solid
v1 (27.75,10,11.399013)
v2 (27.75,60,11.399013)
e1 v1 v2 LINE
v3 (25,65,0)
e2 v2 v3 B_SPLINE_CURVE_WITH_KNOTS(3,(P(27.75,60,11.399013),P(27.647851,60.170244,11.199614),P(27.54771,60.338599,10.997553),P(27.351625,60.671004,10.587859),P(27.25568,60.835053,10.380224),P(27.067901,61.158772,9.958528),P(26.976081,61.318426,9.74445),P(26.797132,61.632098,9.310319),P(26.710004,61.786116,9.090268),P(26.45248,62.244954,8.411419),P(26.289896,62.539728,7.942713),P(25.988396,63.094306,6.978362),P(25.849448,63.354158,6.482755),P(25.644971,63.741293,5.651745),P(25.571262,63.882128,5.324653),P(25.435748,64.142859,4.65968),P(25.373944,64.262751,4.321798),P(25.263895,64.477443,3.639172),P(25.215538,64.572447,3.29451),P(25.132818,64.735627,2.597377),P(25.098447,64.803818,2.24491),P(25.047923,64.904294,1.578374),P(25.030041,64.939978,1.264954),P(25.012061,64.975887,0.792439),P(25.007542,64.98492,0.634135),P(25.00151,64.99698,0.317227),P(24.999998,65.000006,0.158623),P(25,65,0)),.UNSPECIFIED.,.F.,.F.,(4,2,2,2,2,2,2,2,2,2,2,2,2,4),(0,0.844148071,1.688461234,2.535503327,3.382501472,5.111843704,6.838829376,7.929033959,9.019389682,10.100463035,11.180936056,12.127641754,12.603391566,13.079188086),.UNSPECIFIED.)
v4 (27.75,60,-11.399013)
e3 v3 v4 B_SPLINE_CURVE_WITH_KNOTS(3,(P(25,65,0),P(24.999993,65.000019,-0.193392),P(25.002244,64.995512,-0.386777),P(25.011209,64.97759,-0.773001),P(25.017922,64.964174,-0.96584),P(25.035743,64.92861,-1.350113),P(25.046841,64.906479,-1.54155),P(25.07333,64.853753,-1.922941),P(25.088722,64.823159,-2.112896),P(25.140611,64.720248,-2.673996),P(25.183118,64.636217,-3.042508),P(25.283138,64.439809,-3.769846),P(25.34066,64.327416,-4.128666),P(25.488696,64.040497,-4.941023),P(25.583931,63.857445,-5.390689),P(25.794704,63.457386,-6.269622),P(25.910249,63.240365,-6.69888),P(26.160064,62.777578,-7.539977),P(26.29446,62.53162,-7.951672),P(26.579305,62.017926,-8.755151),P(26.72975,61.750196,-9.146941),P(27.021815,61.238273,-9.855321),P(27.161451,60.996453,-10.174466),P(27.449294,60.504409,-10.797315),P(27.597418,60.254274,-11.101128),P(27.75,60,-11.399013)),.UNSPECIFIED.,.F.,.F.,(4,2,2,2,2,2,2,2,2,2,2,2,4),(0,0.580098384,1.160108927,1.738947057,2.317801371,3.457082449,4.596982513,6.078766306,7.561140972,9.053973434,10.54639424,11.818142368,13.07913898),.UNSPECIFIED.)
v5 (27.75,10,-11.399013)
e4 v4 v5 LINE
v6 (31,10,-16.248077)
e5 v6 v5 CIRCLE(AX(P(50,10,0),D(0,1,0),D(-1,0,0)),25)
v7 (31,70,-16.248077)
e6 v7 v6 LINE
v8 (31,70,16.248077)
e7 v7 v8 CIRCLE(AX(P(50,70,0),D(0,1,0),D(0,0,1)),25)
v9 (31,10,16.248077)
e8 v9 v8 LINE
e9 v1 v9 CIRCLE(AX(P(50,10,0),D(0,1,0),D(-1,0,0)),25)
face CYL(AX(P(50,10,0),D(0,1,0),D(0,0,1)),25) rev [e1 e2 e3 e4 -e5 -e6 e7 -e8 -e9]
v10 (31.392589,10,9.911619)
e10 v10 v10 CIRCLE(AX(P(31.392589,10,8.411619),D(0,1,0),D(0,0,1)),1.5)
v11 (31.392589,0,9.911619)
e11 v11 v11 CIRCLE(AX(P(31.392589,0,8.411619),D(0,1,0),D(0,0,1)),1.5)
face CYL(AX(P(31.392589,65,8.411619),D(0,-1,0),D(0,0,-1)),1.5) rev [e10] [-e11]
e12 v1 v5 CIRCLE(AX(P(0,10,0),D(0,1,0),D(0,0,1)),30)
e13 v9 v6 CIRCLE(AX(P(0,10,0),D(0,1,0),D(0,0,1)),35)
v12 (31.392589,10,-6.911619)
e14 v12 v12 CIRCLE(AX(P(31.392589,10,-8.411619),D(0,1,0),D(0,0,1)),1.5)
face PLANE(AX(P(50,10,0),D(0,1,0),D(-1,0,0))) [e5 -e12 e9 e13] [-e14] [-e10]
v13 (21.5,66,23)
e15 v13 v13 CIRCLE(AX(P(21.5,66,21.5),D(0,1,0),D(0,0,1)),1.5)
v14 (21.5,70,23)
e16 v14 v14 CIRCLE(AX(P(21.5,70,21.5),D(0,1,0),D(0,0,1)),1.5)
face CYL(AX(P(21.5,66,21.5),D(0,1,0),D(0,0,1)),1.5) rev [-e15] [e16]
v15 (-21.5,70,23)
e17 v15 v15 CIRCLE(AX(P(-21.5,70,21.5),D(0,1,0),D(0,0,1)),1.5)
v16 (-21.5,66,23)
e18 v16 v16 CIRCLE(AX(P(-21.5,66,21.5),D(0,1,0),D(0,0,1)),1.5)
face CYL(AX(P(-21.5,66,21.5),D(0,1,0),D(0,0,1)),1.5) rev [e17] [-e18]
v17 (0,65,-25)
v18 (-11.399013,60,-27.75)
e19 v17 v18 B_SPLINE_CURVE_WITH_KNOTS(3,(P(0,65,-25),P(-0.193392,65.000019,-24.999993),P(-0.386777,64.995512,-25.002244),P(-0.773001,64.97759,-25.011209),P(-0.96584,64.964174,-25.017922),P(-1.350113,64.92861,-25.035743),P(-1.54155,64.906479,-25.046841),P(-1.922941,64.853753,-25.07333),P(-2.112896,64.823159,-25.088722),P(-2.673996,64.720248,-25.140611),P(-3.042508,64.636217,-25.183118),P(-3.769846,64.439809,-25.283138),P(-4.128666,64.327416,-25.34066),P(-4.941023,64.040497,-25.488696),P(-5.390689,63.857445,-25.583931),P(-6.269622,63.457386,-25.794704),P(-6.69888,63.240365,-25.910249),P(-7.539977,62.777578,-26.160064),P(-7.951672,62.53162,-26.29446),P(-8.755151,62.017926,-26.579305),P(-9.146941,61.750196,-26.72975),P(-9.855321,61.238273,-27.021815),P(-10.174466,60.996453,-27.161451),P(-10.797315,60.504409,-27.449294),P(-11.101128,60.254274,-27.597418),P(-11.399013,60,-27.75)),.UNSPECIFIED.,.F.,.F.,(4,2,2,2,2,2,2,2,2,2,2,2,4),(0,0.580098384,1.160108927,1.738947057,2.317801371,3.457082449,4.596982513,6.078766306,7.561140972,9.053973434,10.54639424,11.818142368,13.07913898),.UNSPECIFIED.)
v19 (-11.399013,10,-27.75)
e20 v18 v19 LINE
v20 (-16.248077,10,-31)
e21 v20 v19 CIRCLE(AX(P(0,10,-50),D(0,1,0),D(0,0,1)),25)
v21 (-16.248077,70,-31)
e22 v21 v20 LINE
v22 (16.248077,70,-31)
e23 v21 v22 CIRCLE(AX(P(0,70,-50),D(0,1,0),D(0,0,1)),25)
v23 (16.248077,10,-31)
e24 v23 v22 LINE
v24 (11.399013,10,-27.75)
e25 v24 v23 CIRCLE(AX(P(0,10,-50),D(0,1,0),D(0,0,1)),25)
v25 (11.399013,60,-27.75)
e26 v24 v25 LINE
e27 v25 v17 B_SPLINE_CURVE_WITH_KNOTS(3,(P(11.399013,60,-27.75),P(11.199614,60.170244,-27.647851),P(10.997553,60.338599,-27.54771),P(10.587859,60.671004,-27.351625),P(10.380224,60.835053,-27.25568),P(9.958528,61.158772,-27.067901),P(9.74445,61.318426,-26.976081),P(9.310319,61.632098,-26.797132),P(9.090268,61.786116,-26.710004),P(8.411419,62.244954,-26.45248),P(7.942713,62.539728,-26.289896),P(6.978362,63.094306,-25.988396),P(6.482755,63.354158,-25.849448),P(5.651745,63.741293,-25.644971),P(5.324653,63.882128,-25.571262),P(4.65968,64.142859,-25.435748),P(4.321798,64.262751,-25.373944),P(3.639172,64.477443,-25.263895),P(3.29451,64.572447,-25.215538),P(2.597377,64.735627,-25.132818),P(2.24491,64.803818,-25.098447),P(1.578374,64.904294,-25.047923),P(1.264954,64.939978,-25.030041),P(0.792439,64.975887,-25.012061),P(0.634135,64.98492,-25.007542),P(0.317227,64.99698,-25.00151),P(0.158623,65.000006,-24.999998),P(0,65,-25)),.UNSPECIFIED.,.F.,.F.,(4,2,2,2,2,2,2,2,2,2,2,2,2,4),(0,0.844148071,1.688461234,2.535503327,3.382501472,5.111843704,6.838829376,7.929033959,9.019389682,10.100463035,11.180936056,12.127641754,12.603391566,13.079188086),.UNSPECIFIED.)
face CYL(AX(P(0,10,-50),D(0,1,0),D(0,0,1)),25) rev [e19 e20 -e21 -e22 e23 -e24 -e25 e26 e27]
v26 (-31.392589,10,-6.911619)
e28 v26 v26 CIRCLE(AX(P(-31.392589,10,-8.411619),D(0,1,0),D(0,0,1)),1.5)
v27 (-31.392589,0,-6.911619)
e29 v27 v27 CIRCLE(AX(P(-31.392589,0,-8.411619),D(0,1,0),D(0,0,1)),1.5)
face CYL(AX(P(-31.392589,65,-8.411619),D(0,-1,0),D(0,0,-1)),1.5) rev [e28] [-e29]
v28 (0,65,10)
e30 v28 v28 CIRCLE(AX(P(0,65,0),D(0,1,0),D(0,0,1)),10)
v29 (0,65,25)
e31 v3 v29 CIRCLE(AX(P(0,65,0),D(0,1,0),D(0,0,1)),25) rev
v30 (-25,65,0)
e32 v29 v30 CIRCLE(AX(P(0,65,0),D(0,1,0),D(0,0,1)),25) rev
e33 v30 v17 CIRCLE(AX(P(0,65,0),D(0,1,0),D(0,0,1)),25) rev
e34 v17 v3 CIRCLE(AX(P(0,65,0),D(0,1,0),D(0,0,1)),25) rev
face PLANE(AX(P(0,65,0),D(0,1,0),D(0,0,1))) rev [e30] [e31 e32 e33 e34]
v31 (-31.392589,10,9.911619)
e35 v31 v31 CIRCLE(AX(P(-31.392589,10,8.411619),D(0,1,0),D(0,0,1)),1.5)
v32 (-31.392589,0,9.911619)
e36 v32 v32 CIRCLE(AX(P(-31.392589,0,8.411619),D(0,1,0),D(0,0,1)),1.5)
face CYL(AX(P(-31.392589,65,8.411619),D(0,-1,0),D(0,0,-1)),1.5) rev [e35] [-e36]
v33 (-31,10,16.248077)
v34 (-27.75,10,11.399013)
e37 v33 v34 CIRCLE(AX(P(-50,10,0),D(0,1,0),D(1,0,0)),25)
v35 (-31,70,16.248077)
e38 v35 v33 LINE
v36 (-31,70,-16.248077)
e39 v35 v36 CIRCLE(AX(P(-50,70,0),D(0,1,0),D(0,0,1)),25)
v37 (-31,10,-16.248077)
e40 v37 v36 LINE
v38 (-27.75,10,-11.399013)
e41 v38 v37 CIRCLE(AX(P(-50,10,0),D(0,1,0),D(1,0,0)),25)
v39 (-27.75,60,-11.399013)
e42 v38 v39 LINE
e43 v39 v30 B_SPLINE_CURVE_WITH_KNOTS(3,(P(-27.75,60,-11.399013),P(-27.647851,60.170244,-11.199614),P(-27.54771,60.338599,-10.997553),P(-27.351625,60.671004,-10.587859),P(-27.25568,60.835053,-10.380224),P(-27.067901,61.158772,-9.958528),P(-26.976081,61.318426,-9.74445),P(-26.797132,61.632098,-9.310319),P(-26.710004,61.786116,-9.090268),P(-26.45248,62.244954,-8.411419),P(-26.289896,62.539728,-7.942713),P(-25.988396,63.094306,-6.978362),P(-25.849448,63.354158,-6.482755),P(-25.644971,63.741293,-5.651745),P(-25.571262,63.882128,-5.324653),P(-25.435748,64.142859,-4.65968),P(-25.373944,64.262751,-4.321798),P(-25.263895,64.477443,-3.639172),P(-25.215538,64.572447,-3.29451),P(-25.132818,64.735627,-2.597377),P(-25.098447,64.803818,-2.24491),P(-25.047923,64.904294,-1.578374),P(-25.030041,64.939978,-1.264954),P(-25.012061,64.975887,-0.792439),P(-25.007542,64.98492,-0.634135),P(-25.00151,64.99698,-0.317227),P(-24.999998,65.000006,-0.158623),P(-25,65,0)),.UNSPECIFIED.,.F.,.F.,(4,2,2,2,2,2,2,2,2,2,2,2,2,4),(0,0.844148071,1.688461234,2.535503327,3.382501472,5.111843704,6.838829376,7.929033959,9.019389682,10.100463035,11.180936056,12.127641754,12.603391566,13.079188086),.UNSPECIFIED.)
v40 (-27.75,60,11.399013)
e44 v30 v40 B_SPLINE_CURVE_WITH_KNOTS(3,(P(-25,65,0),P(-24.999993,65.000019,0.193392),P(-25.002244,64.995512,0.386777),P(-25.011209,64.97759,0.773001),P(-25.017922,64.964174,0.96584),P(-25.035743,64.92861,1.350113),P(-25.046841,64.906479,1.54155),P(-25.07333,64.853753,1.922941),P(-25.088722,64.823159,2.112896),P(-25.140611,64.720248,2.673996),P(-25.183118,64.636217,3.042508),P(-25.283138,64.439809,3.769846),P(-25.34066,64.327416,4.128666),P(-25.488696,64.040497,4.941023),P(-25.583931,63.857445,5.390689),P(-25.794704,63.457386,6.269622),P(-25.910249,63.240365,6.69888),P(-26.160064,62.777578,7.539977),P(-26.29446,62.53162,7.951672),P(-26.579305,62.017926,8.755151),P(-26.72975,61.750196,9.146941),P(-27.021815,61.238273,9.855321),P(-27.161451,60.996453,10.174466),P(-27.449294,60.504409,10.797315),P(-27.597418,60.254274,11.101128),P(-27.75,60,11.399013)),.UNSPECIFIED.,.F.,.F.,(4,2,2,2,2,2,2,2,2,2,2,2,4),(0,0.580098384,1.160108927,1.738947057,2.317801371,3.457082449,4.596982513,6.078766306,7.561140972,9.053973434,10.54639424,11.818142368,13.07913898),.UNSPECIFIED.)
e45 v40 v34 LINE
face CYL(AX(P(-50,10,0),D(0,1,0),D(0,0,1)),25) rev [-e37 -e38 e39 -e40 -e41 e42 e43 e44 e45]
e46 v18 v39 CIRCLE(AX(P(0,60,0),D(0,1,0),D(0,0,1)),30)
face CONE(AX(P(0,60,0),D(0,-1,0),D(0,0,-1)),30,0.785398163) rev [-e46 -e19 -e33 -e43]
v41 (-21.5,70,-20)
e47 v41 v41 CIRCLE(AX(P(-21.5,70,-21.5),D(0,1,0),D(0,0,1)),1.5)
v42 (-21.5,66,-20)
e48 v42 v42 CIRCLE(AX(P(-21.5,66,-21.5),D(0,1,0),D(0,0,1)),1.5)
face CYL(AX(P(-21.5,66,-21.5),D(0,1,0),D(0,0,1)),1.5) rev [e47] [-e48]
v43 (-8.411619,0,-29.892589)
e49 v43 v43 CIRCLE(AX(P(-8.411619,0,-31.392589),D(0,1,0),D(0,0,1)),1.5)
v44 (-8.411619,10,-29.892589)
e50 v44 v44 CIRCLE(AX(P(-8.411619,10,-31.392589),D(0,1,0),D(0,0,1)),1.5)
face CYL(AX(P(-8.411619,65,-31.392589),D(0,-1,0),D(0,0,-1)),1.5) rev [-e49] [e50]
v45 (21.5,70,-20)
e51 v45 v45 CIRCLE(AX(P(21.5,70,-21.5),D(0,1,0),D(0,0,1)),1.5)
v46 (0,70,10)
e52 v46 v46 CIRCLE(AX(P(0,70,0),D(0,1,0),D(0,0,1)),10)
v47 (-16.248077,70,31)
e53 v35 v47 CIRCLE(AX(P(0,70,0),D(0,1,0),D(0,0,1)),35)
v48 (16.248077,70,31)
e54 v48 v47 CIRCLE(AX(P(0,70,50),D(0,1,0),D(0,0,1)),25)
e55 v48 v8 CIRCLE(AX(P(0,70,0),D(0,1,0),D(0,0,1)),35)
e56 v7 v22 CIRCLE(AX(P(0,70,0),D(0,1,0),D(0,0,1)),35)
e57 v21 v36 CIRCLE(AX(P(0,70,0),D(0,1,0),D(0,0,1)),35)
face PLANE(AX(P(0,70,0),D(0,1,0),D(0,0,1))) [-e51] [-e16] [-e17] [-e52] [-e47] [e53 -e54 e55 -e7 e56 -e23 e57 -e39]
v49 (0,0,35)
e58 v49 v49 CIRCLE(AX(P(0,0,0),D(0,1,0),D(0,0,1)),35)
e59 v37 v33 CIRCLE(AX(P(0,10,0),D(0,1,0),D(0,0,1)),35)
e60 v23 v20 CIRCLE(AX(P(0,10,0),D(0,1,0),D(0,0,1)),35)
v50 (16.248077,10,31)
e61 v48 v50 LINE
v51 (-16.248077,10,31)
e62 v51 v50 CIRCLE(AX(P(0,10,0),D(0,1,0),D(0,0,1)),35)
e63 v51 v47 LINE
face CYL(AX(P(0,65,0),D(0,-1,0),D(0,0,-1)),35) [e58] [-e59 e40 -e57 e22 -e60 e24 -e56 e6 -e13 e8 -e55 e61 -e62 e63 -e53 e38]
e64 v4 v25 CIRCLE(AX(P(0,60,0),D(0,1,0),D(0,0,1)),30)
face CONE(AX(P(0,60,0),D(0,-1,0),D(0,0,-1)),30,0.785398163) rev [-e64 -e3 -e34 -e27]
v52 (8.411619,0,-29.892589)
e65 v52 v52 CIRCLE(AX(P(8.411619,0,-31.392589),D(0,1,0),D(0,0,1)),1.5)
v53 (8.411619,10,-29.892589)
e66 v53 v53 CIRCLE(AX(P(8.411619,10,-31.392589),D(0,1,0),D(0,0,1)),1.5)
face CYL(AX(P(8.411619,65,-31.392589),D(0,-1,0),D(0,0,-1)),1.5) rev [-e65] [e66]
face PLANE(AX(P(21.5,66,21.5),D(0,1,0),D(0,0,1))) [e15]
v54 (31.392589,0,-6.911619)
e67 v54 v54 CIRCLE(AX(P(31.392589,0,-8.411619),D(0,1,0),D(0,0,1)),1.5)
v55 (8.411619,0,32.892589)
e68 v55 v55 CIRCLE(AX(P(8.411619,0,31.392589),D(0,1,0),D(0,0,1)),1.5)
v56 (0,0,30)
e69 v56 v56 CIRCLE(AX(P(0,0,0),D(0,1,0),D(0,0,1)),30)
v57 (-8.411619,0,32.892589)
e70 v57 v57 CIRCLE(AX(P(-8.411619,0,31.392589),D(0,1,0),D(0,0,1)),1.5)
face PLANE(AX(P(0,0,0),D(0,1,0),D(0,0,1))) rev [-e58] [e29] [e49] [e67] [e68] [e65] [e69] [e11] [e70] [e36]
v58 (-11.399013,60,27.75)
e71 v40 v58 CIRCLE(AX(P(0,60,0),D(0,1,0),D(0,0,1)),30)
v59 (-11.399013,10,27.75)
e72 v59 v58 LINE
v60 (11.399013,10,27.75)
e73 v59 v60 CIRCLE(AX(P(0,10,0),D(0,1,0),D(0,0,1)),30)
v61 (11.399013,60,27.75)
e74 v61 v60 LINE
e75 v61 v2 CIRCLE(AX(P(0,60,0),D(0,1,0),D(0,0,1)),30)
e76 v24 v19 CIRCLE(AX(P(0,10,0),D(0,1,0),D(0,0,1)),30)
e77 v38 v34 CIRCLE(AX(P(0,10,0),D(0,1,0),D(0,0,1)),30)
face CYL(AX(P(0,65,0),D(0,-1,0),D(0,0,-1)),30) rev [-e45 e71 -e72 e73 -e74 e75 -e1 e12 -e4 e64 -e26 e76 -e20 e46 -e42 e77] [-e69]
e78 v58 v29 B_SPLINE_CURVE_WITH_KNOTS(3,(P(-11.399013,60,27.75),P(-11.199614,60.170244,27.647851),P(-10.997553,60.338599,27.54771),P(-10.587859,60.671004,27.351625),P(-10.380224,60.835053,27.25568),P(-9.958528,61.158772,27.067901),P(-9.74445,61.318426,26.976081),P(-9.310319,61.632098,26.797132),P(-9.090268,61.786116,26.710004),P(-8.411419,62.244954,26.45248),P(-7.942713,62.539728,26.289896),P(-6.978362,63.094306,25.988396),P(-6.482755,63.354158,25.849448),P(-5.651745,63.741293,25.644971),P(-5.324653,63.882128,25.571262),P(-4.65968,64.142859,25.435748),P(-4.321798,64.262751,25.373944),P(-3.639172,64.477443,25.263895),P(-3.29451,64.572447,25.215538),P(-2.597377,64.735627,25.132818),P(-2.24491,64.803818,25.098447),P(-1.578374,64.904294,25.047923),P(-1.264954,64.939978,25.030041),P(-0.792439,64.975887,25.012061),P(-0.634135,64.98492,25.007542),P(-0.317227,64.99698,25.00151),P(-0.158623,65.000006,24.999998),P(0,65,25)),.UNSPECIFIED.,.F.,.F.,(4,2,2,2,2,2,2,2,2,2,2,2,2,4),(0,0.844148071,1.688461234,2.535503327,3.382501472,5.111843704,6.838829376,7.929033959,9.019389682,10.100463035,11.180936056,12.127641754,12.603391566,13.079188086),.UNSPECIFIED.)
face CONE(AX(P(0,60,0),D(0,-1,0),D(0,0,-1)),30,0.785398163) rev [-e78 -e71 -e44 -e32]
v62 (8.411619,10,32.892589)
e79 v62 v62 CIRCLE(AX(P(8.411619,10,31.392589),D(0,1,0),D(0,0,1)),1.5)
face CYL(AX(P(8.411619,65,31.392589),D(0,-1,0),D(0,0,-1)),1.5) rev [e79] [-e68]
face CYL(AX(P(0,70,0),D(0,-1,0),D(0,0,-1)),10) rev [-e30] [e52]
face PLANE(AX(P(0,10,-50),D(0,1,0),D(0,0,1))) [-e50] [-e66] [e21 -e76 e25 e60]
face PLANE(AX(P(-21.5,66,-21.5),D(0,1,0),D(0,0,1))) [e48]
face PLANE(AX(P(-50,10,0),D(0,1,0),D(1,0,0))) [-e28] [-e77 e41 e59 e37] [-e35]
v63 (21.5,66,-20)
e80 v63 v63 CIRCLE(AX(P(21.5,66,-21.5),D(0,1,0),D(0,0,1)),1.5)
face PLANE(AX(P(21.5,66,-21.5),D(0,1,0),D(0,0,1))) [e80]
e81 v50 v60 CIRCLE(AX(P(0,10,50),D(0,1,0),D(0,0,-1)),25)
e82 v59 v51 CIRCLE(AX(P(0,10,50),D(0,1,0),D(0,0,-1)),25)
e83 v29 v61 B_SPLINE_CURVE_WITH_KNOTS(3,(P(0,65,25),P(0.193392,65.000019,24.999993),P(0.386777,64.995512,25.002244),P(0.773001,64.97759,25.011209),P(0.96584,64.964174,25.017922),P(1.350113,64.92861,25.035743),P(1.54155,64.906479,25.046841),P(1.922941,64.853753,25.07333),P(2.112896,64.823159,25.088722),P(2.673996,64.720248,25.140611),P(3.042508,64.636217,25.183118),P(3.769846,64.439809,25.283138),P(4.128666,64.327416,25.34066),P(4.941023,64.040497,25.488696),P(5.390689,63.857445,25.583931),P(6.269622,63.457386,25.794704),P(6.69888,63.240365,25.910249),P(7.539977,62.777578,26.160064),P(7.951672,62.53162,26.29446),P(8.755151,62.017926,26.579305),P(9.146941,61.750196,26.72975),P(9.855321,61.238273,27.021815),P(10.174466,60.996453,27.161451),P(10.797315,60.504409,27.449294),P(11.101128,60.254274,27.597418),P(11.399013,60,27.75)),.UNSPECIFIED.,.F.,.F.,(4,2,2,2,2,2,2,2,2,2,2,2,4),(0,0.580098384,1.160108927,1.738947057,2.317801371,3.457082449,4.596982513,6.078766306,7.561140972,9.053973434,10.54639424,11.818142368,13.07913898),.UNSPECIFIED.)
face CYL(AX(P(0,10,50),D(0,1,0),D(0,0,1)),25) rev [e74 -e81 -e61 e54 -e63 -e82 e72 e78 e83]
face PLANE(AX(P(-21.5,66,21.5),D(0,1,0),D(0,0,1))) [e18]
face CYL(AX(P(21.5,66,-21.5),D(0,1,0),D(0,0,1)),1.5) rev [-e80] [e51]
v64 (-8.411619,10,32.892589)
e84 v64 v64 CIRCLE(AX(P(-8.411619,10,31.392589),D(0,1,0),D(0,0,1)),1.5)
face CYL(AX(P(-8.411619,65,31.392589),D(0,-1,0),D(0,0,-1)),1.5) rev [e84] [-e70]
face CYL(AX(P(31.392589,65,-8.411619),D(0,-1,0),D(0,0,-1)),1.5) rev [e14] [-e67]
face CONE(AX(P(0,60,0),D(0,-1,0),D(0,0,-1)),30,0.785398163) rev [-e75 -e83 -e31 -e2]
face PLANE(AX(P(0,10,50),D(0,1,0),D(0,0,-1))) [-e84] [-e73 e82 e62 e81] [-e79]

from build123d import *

# Parameters (mm, degrees)
SKETCH1_R           = 35
SKETCH1_R_2         = 30
SKETCH1_R_3         = 1.5
BOSS_EXTRUDE1_DEPTH = 65
SKETCH2_R           = 35
SKETCH2_R_2         = 1.5
SKETCH2_R_3         = 10
BOSS_EXTRUDE2_DEPTH = 5
SKETCH3_R           = 25
CUT_EXTRUDE1_DEPTH  = 60
CIRPATTERN1_COUNT   = 4
CHAMFER1_SIZE       = 5
SKETCH4_R           = 1.5
CUT_EXTRUDE2_DEPTH  = 4


with BuildPart() as part:
    # Sketch1 → Boss-Extrude1 (new body)
    with BuildSketch(Plane(origin=(0, 0, 0), x_dir=(1, 0, 0), z_dir=(0, 1, 0))):
        with Locations(Location((0, 0, 0), (0, 0, 270))):
            Circle(SKETCH1_R)
        with Locations(Location((0, 0, 0), (0, 0, 270))):
            Circle(SKETCH1_R_2, mode=Mode.SUBTRACT)
        with Locations(Location((-8.411618966, 31.392589354, 0), (0, 0, 270))):
            Circle(SKETCH1_R_3, mode=Mode.SUBTRACT)
        with Locations(Location((8.411618966, 31.392589354, 0), (0, 0, 270))):
            Circle(SKETCH1_R_3, mode=Mode.SUBTRACT)
        with Locations(Location((31.392589354, 8.411618966, 0), (0, 0, 270))):
            Circle(SKETCH1_R_3, mode=Mode.SUBTRACT)
        with Locations(Location((31.392589354, -8.411618966, 0), (0, 0, 270))):
            Circle(SKETCH1_R_3, mode=Mode.SUBTRACT)
        with Locations(Location((8.411618966, -31.392589354, 0), (0, 0, 270))):
            Circle(SKETCH1_R_3, mode=Mode.SUBTRACT)
        with Locations(Location((-8.411618966, -31.392589354, 0), (0, 0, 270))):
            Circle(SKETCH1_R_3, mode=Mode.SUBTRACT)
        with Locations(Location((-31.392589354, -8.411618966, 0), (0, 0, 270))):
            Circle(SKETCH1_R_3, mode=Mode.SUBTRACT)
        with Locations(Location((-31.392589354, 8.411618966, 0), (0, 0, 270))):
            Circle(SKETCH1_R_3, mode=Mode.SUBTRACT)
    extrude(amount=BOSS_EXTRUDE1_DEPTH)

    # Sketch2 → Boss-Extrude2 (add)
    with BuildSketch(Plane(origin=(0, 65, 0), x_dir=(1, 0, 0), z_dir=(0, 1, 0))):
        with Locations(Location((0, 0, 0), (0, 0, 270))):
            Circle(SKETCH2_R)
        with Locations(Location((-8.411618966, 31.392589354, 0), (0, 0, 270))):
            Circle(SKETCH2_R_2, mode=Mode.SUBTRACT)
        with Locations(Location((8.411618966, 31.392589354, 0), (0, 0, 270))):
            Circle(SKETCH2_R_2, mode=Mode.SUBTRACT)
        with Locations(Location((31.392589354, 8.411618966, 0), (0, 0, 270))):
            Circle(SKETCH2_R_2, mode=Mode.SUBTRACT)
        with Locations(Location((31.392589354, -8.411618966, 0), (0, 0, 270))):
            Circle(SKETCH2_R_2, mode=Mode.SUBTRACT)
        with Locations(Location((8.411618966, -31.392589354, 0), (0, 0, 270))):
            Circle(SKETCH2_R_2, mode=Mode.SUBTRACT)
        with Locations(Location((-8.411618966, -31.392589354, 0), (0, 0, 270))):
            Circle(SKETCH2_R_2, mode=Mode.SUBTRACT)
        with Locations(Location((-31.392589354, -8.411618966, 0), (0, 0, 270))):
            Circle(SKETCH2_R_2, mode=Mode.SUBTRACT)
        with Locations(Location((-31.392589354, 8.411618966, 0), (0, 0, 270))):
            Circle(SKETCH2_R_2, mode=Mode.SUBTRACT)
        with Locations(Location((0, 0, 0), (0, 0, 270))):
            Circle(SKETCH2_R_3, mode=Mode.SUBTRACT)
    extrude(amount=BOSS_EXTRUDE2_DEPTH)

    # Sketch3 → Cut-Extrude1 (cut)
    with BuildSketch(Plane(origin=(0, 70, 0), x_dir=(1, 0, 0), z_dir=(0, 1, 0))):
        with Locations((0, 50)):
            Circle(SKETCH3_R)
    cut_extrude1 = extrude(amount=-CUT_EXTRUDE1_DEPTH, mode=Mode.SUBTRACT)

    # CirPattern1: Cut-Extrude1 ×4 about axis
    cirpattern1_axis = Axis((0, 0, 0), (0, 1, 0))
    for i in range(1, CIRPATTERN1_COUNT):
        add(cut_extrude1.rotate(cirpattern1_axis, i * 360 / CIRPATTERN1_COUNT), mode=Mode.SUBTRACT)

    # Chamfer1
    chamfer1_edges = [part.edges().sort_by_distance(p)[0] for p in [
        (-21.213203436, 65, -21.213203436),
        (21.213203436, 65, 21.213203436),
        (21.213203436, 65, -21.213203436),
        (-21.213203436, 65, 21.213203436),
    ]]
    chamfer(chamfer1_edges, length=CHAMFER1_SIZE - 0.0001)  # a hair under: the kernel refuses the full size

    # Sketch4 → Cut-Extrude2 (cut)
    with BuildSketch(Plane(origin=(0, 70, 0), x_dir=(1, 0, 0), z_dir=(0, 1, 0))):
        with Locations(Location((-21.5, 21.5, 0), (0, 0, 270))):
            Circle(SKETCH4_R)
        with Locations(Location((21.5, 21.5, 0), (0, 0, 270))):
            Circle(SKETCH4_R)
        with Locations(Location((21.5, -21.5, 0), (0, 0, 270))):
            Circle(SKETCH4_R)
        with Locations(Location((-21.5, -21.5, 0), (0, 0, 270))):
            Circle(SKETCH4_R)
    extrude(amount=-CUT_EXTRUDE2_DEPTH, mode=Mode.SUBTRACT)


solid = part.part
